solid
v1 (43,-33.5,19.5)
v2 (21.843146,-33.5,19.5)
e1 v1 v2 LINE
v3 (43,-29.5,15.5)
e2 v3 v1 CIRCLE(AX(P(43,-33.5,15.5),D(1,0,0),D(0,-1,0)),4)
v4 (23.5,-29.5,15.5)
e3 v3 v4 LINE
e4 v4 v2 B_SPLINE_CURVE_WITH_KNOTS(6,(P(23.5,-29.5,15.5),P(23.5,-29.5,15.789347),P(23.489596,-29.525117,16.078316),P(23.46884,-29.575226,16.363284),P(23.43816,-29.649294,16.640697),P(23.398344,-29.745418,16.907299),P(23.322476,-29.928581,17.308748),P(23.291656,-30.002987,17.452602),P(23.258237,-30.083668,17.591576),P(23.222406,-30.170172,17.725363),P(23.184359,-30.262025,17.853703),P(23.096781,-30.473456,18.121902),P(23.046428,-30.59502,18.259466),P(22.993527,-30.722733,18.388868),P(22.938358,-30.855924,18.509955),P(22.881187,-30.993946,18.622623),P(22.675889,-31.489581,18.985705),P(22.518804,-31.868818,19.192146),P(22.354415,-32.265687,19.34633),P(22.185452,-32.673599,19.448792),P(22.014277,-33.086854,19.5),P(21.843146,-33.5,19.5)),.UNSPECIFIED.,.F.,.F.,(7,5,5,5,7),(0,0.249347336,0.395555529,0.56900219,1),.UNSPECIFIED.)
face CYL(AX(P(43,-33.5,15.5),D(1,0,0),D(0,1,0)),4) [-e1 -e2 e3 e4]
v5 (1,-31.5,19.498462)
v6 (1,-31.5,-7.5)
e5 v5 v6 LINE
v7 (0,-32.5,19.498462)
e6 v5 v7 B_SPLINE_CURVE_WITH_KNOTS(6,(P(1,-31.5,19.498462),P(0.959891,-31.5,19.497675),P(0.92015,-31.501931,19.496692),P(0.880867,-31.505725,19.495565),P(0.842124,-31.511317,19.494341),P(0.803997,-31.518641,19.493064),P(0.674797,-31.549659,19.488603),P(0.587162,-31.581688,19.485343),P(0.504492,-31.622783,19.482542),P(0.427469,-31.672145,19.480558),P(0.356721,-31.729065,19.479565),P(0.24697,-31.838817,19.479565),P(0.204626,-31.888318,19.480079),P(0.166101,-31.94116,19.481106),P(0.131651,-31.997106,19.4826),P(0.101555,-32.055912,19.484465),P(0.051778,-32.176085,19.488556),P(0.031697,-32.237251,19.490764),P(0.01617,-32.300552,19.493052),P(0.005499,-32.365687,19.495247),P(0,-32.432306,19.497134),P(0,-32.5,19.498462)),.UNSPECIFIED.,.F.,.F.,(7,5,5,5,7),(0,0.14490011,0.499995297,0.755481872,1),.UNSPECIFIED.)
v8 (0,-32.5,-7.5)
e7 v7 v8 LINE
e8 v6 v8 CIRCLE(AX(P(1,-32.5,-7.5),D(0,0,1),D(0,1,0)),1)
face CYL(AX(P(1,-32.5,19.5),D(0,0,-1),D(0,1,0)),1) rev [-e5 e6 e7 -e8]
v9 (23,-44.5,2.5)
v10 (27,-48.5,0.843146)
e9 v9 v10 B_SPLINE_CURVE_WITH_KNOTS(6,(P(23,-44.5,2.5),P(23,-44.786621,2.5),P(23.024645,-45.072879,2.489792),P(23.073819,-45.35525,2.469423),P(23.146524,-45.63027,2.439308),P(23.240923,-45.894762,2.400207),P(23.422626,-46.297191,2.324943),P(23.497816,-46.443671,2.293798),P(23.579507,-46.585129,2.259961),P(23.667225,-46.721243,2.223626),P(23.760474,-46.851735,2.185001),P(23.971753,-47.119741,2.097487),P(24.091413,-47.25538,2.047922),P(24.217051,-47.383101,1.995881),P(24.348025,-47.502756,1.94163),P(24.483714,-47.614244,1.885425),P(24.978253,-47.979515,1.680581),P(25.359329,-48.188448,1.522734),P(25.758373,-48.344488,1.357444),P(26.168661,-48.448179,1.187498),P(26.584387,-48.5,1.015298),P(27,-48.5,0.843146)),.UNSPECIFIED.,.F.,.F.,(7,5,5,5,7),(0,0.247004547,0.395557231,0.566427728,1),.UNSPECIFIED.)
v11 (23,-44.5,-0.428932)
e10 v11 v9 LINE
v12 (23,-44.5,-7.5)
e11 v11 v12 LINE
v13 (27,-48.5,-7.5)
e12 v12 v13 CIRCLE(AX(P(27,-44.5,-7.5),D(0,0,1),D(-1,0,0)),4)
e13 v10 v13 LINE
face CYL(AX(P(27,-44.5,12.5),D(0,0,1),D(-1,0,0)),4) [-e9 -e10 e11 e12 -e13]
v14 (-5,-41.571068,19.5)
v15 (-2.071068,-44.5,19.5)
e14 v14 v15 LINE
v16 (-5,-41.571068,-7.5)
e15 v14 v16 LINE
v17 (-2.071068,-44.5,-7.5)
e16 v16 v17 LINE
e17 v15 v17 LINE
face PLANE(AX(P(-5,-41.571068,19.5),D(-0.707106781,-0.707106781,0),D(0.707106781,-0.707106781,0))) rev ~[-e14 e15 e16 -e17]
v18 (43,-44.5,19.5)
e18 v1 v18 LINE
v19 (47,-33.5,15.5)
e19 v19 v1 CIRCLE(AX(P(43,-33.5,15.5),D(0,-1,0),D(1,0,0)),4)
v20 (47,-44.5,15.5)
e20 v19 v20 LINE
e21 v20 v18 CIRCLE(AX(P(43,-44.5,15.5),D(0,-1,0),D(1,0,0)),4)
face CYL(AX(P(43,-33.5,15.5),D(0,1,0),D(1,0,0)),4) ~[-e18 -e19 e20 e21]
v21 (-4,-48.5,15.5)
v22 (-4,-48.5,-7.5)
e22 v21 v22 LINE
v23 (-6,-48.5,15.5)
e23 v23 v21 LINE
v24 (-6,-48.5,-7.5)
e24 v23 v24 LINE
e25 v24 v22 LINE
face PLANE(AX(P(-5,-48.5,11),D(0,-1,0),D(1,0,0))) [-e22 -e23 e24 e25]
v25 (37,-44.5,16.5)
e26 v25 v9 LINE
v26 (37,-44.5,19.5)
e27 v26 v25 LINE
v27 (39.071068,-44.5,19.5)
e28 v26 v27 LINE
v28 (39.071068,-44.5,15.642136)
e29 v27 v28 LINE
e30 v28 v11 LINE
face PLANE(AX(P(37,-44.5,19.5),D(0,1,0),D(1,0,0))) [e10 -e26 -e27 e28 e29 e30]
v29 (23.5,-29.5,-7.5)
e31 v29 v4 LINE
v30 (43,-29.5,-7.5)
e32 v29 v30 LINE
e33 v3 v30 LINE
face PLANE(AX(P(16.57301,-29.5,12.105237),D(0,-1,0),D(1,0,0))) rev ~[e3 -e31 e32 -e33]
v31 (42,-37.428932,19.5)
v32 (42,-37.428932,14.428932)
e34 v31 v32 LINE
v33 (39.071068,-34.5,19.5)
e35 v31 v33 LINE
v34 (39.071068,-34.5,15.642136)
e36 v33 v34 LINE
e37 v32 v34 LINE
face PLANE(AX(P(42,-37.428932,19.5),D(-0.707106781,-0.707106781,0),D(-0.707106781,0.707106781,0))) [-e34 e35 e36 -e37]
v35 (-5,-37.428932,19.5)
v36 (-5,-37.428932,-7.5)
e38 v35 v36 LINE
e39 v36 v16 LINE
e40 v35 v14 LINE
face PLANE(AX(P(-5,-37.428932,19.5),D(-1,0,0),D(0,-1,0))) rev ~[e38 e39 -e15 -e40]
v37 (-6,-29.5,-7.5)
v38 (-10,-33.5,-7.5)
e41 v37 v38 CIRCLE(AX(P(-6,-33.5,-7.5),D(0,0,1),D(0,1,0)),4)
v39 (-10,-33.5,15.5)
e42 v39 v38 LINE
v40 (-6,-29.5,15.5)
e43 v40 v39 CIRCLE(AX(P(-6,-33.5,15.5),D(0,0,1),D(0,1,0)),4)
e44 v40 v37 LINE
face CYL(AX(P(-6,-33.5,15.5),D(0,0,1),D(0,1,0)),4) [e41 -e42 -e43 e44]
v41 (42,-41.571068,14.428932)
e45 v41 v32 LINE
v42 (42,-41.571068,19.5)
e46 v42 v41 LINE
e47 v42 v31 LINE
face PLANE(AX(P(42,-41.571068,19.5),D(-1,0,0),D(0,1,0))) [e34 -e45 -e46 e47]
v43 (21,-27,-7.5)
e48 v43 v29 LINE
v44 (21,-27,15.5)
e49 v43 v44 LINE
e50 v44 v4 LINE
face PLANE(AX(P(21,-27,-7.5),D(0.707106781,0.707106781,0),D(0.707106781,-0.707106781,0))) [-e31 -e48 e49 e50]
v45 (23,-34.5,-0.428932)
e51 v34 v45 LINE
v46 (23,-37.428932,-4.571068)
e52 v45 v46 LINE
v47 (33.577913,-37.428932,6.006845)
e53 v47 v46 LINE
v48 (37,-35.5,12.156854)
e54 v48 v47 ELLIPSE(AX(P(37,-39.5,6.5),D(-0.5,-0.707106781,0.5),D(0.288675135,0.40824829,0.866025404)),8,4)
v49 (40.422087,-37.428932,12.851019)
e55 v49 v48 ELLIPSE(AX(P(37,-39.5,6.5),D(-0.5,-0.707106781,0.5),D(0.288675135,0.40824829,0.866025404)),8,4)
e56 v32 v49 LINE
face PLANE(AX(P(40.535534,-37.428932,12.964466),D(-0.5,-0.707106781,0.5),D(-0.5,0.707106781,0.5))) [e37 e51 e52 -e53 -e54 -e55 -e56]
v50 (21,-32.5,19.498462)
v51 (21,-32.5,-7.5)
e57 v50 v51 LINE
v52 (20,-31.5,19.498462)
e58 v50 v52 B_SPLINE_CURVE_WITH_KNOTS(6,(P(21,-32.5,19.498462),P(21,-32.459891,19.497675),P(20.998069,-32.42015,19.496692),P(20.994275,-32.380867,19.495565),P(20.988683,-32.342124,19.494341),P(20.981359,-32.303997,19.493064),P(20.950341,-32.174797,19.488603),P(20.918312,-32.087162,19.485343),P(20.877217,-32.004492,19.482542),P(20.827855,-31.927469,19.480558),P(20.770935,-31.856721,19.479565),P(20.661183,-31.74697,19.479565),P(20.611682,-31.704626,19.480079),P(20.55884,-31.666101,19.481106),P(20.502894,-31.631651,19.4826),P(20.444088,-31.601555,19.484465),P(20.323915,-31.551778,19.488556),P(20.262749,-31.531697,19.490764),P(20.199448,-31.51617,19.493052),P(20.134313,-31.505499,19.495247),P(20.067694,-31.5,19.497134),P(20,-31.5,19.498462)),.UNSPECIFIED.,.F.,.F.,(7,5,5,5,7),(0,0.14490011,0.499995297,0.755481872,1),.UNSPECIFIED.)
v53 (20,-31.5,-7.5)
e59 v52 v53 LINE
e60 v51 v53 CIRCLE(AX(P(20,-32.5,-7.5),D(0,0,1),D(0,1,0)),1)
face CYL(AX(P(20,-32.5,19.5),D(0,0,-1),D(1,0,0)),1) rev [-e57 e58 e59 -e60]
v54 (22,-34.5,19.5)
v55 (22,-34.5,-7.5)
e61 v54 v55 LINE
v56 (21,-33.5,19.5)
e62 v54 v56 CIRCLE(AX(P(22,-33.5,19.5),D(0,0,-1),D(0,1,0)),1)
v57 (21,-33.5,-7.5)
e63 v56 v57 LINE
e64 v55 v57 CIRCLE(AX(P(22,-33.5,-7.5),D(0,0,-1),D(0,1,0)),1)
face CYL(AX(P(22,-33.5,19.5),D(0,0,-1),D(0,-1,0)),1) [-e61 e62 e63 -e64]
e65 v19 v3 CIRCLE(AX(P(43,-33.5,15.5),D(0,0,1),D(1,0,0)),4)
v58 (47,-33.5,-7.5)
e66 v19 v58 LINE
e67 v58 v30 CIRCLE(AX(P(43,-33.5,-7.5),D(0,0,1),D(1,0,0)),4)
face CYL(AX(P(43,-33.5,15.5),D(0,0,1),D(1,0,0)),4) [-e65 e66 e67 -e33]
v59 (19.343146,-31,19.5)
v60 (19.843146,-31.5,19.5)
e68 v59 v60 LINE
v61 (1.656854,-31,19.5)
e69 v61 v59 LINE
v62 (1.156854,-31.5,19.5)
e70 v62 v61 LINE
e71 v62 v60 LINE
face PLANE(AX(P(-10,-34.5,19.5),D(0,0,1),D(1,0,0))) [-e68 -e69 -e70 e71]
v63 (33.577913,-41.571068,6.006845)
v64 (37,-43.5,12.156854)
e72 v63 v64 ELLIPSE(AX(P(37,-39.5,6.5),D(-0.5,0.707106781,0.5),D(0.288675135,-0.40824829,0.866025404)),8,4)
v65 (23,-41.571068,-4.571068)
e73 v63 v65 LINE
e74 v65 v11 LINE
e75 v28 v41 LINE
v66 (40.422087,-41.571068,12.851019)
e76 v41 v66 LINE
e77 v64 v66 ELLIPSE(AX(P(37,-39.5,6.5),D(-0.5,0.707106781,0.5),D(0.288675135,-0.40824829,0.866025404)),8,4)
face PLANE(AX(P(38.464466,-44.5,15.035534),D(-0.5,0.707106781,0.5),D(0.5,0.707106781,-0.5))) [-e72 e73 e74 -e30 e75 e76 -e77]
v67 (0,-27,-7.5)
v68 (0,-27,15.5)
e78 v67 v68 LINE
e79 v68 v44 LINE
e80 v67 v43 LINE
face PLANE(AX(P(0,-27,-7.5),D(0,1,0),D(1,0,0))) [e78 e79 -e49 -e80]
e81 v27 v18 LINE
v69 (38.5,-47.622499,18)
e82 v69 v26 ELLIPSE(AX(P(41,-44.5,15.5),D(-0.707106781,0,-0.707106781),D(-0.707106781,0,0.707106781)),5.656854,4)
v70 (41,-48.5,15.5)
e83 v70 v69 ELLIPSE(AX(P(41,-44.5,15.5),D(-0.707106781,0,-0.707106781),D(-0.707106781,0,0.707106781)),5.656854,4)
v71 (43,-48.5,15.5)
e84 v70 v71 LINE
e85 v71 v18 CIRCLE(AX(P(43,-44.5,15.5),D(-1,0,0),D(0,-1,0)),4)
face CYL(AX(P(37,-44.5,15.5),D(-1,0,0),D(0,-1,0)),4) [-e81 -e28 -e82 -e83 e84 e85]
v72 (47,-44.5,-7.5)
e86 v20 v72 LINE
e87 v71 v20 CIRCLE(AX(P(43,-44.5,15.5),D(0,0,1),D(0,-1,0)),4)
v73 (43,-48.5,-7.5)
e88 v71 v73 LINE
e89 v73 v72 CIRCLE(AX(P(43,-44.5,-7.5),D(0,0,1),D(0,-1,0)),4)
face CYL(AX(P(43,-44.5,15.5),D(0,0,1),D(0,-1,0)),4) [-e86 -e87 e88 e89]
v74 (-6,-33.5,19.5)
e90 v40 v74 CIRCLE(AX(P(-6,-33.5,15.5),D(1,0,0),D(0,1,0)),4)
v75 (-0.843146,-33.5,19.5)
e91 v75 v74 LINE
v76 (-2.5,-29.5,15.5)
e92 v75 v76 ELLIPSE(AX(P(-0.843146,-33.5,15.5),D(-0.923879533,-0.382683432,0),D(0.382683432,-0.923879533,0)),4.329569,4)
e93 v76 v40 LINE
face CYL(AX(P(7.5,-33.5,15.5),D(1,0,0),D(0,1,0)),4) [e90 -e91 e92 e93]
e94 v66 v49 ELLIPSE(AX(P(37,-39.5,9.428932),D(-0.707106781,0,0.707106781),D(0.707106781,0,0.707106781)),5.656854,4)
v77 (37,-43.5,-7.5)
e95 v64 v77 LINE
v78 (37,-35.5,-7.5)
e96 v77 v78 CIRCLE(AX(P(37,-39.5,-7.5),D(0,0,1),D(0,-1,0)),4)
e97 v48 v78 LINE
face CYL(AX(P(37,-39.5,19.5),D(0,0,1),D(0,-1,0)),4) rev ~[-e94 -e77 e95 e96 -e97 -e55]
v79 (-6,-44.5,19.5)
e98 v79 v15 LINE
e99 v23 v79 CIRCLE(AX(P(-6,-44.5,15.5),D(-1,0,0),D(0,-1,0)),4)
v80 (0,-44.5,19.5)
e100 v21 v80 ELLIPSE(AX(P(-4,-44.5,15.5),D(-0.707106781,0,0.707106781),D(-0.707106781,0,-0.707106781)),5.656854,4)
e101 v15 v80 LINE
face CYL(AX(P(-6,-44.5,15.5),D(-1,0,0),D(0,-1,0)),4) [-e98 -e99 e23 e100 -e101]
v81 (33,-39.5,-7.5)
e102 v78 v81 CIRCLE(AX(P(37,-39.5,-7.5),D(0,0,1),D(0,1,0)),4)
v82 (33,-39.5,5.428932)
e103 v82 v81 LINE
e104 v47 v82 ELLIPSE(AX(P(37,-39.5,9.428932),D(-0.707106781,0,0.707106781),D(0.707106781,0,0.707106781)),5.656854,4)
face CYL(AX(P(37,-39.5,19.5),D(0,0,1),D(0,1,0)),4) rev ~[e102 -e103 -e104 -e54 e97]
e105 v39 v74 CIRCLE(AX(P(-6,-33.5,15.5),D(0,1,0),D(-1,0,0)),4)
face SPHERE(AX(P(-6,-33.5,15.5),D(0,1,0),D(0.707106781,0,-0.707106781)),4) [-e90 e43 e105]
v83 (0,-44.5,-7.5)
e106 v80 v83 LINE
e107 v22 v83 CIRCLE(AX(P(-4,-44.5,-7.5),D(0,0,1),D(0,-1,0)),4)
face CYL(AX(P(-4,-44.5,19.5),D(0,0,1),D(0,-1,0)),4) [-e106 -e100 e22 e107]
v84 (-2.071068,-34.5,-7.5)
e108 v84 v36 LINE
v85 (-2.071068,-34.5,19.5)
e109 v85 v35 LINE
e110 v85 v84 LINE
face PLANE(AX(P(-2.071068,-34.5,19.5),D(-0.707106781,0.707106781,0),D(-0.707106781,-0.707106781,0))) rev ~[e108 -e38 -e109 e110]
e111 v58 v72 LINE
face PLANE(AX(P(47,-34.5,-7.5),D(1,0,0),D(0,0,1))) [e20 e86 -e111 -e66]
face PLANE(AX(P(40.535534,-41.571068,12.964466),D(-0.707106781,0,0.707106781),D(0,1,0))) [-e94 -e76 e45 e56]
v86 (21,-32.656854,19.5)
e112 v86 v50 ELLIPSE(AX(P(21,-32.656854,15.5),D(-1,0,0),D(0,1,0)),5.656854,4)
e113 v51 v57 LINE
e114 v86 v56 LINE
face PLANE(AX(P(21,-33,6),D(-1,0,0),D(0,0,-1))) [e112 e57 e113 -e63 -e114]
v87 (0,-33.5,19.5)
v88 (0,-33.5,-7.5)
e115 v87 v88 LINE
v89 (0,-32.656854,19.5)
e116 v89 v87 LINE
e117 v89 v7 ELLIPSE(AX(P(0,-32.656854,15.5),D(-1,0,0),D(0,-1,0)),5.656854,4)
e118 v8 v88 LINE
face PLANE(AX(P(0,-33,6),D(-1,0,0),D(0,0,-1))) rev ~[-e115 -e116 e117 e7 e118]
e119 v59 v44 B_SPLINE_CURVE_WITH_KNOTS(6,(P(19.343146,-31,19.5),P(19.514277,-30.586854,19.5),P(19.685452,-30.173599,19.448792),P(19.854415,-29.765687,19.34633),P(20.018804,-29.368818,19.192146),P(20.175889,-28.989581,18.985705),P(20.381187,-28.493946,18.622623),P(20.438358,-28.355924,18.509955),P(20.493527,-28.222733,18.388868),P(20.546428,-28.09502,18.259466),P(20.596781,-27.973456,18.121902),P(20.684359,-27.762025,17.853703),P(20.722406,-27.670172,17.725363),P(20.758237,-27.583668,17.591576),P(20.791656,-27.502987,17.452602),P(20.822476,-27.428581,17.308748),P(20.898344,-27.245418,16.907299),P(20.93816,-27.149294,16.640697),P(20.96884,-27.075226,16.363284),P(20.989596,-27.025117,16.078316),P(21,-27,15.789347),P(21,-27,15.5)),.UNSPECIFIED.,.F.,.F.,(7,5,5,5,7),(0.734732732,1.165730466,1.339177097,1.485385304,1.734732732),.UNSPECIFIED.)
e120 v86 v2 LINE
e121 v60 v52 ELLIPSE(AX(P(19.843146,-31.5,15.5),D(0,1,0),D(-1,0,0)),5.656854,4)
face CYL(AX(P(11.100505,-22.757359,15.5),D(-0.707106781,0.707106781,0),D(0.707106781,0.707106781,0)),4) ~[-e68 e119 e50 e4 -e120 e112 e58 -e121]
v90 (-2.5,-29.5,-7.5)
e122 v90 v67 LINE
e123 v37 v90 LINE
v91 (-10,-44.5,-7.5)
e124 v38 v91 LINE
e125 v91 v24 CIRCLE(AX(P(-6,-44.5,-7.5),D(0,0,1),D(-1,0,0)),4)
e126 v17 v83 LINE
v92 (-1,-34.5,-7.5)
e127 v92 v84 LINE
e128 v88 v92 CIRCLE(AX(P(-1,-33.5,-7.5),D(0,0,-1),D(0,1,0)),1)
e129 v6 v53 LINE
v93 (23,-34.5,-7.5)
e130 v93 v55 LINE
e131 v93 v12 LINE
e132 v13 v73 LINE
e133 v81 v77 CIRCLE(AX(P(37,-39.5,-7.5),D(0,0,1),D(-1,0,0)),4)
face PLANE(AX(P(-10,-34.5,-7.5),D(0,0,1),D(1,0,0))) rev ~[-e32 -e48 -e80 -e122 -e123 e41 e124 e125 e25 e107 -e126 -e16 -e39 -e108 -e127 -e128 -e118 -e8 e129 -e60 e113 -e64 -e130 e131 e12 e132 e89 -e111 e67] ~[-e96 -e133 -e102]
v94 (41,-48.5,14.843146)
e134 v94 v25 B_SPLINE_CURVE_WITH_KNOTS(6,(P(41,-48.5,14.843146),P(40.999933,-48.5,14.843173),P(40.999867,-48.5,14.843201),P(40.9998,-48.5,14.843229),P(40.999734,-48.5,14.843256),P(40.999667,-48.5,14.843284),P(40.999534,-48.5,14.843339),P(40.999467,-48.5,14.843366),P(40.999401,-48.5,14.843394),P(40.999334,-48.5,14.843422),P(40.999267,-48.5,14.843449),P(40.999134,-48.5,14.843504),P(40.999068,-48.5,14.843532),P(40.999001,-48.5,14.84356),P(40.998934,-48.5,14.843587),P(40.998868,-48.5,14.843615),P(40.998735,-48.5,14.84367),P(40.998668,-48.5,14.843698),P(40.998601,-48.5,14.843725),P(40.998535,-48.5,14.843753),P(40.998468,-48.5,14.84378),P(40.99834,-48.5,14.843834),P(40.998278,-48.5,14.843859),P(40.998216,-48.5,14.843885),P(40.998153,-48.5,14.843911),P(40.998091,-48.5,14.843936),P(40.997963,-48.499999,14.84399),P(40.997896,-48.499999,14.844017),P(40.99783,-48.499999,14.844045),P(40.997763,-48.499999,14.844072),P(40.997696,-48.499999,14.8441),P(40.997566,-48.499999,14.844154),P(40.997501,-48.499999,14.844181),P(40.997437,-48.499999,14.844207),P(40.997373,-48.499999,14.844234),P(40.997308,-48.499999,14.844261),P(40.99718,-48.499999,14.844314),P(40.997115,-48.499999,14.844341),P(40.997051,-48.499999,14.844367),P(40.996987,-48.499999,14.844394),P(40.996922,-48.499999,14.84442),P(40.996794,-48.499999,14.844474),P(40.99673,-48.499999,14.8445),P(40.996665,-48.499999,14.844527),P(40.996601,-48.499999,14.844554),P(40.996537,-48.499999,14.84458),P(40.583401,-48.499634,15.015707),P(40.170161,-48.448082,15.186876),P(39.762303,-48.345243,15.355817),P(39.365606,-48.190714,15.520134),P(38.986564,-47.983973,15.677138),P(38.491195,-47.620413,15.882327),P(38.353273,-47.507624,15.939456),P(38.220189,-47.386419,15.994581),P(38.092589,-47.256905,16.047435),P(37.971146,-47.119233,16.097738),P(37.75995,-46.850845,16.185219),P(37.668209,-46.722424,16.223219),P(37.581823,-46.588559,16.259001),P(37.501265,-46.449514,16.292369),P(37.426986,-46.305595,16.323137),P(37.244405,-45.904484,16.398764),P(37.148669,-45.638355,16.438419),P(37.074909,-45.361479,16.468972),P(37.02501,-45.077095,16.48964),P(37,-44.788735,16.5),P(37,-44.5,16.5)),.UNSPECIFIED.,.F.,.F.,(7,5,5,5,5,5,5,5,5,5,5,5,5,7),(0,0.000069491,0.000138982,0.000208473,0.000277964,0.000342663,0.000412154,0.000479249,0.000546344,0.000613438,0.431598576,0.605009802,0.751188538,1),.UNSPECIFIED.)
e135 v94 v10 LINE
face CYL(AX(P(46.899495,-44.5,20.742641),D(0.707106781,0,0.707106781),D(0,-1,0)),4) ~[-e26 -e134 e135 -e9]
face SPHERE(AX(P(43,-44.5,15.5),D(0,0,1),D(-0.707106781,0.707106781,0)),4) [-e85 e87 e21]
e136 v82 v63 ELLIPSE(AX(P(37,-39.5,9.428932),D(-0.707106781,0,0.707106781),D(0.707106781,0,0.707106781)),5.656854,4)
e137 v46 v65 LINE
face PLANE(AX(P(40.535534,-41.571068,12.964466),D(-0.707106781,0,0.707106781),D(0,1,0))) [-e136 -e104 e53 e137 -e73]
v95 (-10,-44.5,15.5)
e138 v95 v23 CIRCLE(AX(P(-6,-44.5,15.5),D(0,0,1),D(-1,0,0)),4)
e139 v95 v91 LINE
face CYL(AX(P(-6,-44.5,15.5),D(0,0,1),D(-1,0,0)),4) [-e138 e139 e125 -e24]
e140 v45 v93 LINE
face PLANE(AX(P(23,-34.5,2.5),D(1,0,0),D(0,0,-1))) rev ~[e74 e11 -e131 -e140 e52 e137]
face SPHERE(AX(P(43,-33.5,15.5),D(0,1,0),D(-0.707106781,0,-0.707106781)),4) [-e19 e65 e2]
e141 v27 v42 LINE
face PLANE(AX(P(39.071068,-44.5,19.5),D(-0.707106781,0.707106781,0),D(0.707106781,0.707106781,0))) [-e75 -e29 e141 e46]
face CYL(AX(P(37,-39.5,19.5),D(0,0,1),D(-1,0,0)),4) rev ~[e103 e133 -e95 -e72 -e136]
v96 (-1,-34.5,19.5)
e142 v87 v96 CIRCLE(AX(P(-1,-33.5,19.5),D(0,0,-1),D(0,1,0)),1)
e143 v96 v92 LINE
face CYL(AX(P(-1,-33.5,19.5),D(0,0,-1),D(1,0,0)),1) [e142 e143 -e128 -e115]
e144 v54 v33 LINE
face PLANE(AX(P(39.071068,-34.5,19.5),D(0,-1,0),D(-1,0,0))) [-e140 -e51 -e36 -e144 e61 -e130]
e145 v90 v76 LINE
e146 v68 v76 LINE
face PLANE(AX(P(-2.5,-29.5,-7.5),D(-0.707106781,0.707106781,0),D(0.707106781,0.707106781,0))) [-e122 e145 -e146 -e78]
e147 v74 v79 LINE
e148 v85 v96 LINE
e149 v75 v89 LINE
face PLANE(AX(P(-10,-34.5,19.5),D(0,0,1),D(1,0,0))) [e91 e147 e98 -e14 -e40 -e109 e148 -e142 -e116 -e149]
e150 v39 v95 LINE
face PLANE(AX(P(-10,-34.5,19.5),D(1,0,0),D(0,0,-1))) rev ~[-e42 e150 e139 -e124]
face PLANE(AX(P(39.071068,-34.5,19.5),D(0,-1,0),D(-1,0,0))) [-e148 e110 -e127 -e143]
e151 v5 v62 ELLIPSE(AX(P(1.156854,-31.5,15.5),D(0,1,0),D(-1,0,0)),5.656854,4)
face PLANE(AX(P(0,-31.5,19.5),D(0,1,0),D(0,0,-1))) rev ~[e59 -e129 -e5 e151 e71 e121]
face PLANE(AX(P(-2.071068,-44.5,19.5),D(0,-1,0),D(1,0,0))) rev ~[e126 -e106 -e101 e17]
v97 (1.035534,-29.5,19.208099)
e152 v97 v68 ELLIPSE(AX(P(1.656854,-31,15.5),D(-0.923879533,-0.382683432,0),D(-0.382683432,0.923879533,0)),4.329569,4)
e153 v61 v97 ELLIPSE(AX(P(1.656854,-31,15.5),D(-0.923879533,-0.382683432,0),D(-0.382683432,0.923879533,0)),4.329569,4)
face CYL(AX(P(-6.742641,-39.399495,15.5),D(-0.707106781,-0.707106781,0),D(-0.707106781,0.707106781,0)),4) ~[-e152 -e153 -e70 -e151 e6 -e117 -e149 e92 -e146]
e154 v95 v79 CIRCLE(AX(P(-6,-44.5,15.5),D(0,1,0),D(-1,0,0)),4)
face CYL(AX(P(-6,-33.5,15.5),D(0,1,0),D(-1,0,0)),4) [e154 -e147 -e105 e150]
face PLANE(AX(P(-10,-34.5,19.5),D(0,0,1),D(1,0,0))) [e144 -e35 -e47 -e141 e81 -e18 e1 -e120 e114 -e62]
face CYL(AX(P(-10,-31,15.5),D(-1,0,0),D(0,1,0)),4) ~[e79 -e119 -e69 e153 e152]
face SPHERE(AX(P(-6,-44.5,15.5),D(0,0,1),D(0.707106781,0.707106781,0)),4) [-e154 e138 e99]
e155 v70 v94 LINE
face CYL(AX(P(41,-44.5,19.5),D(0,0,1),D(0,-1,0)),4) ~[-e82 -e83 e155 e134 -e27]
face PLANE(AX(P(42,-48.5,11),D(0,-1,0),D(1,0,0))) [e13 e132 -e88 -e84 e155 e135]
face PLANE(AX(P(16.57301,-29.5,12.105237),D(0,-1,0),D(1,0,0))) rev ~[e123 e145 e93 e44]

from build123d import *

# Parameters (mm, degrees)
F0_W           = 10
F0_H           = 17
F0_H_2         = 10
F0_W_2         = 23
F1_DEPTH       = 5
F2_DEPTH       = 14
F4_DEPTH       = 35
F8_DEPTH       = 27.001
F8_DEPTH_BACK  = 35
F10_W          = 27
F10_H          = 3
F11_DEPTH      = 21
F13_DEPTH      = 27
F14_R          = 1
F15_T1_DEPTH   = 11
F15_T3_DEPTH   = 6
F15_T5_DEPTH   = 23
F15_T7_DEPTH   = 6
F15_T9_DEPTH   = 27
F15_S13_W      = 4.08
F15_S13_H      = 4.08
F15_T14_DEPTH  = 4.08
F15_S19_W      = 4.08
F15_S19_H      = 4.08
F15_T20_DEPTH  = 4.08
F15_S25_W      = 4.08
F15_S25_H      = 4.08
F15_T26_DEPTH  = 4.08
F15_S31_W      = 4.08
F15_S31_H      = 4.08
F15_T32_DEPTH  = 4.08
F15_T38_DEPTH  = 13
F15_T43_DEPTH  = 39.7989898732
F15_T49_DEPTH  = 20
F15_T54_DEPTH  = 29.5
F15_T59_DEPTH  = 23.5355339059
F15_T65_DEPTH  = 41
F15_T71_DEPTH  = 23.5355339059
F15_T77_DEPTH  = 13.5
F15_T83_DEPTH  = 16
F15_T87_DEPTH  = 23
F15_T95_DEPTH  = 16
F15_T99_DEPTH  = 37
F15_T106_DEPTH = 13
F15_T110_DEPTH = 39.7989898732
F15_T117_DEPTH = 20
F15_T121_DEPTH = 39.7989898732
F15_T128_DEPTH = 29.5
F15_T132_DEPTH = 23.5355339059
F15_T139_DEPTH = 23.5355339059
F15_T143_DEPTH = 41
F15_T150_DEPTH = 41
F15_T154_DEPTH = 23.5355339059
F15_T161_DEPTH = 23.5355339059
F15_T165_DEPTH = 13.5
F16_ANGLE      = 270


# Not quite as in the source:
# - a fillet or chamfer that OpenCascade refuses, or shapes differently, is made with other operations: its cross-section is extruded or revolved along the edge and cut away or added


with BuildPart() as f1:
    # F0 (on Top) → F1 (new body)
    with BuildSketch(Plane.XY):
        Polygon((37, 0), (0, 0), (0, -17), (23, -17), (37, -3), align=None)
        with Locations((-5, -8.5)):
            Rectangle(F0_W, F0_H)
        Polygon((37, -17), (23, -17), (23, -27), (47, -27), (47, -17), align=None)
        with Locations((-5, -22)):
            Rectangle(F0_W, F0_H_2)
        Polygon((47, 0), (37, 0), (37, -3), (37, -17), (47, -17), align=None)
        with Locations((11.5, -22)):
            Rectangle(F0_W_2, F0_H_2)
        Polygon((37, -17), (37, -3), (23, -17), align=None)
    extrude(amount=-F1_DEPTH)

    # F0 (on Top) → F2 (join)
    with BuildSketch(Plane.XY):
        with Locations((-5, -8.5)):
            Rectangle(F0_W, F0_H)
        Polygon((47, 0), (37, 0), (37, -3), (37, -17), (47, -17), align=None)
        Polygon((37, -17), (37, -3), (23, -17), align=None)
        Polygon((37, -17), (23, -17), (23, -27), (47, -27), (47, -17), align=None)
        with Locations((-5, -22)):
            Rectangle(F0_W, F0_H_2)
    extrude(amount=F2_DEPTH)

    # F3 (on face) → F4 (cut)
    with BuildSketch(Plane(origin=(0, 0, 0), x_dir=(-1, 0, 0), z_dir=(0, 1, 0))):
        Polygon((2.0710678119, 0), (5, 2.9289321881), (5, 7.0710678119), (2.0710678119, 10), (0, 10), (0, 0), align=None)
    extrude(amount=-F4_DEPTH, mode=Mode.SUBTRACT)

    # F7: sweep along a path in F6
    with BuildLine(Plane.XY.offset(4.5)) as f7_path:
        Line((37, 0), (37, -3))
        Line((37, -3), (23, -17))
        Line((23, -17), (19.396028844, -20.603971156))
    # F3 (on face) → F7 (sweep, cut)
    with BuildSketch(Plane(origin=(0, 0, 0), x_dir=(-1, 0, 0), z_dir=(0, 1, 0))):
        with BuildLine():
            Line((-39.0710678119, 0), (-37, 0))
            Line((-37, 0), (-37, 1))
            ThreePointArc((-37, 1), (-41, 5), (-37, 9))
            Line((-37, 9), (-37, 10))
            Line((-37, 10), (-39.0710678119, 10))
            Line((-39.0710678119, 10), (-42, 7.0710678119))
            Line((-42, 7.0710678119), (-42, 2.9289321881))
            Line((-42, 2.9289321881), (-39.0710678119, 0))
        make_face()
        with BuildLine():
            ThreePointArc((-37, 9), (-41, 5), (-37, 1))
            Line((-37, 1), (-37, 9))
        make_face()
    sweep(path=f7_path.line, transition=Transition.RIGHT, mode=Mode.SUBTRACT)

    # F3 (on face) → F8 (cut, two sides)
    with BuildSketch(Plane(origin=(0, 0, 0), x_dir=(-1, 0, 0), z_dir=(0, 1, 0))) as f8_sk:
        with BuildLine():
            Line((-37, 9), (-37, 1))
            ThreePointArc((-37, 1), (-34.1715728753, 2.1715728753), (-33, 5))
            ThreePointArc((-33, 5), (-34.1715728753, 7.8284271247), (-37, 9))
        make_face()
        with BuildLine():
            ThreePointArc((-37, 9), (-41, 5), (-37, 1))
            Line((-37, 1), (-37, 9))
        make_face()
    extrude(amount=-F8_DEPTH, mode=Mode.SUBTRACT)
    extrude(f8_sk.sketch, amount=F8_DEPTH_BACK, mode=Mode.SUBTRACT)

    # F10 (on offset) → F11 (cut)
    with BuildSketch(Plane(origin=(0, 0, 0), x_dir=(0, -1, 0), z_dir=(-1, 0, 0))):
        with Locations((13.5, -1.5)):
            Rectangle(F10_W, F10_H)
    extrude(amount=-F11_DEPTH, mode=Mode.SUBTRACT)

    # F12 (on face) → F13 (join, through all)
    with BuildSketch(Plane.XZ.offset(27)):
        Polygon((21, -7.5), (23.5, -5), (-2.5, -5), (0, -7.5), align=None)
    extrude(amount=-F13_DEPTH)

    # F14
    f14_edges = [f1.edges().sort_by_distance(p)[0] for p in [
        (0, -13.5, 0),
        (21, -13.5, 0),
        (21, -13.5, -3),
        (0, -13.5, -3),
    ]]
    fillet(f14_edges, radius=F14_R)

    # F15: fillet of radius 4 on 17 edges, made by hand

    # F15_s2 → F15_t1 (cut)
    with BuildSketch(Plane.XY.offset(-1)):
        with BuildLine():
            ThreePointArc((-10, -4), (-8.8284271247, -1.1715728753), (-6, 0))
            Line((-6, 0), (-6, 0.08))
            Line((-6, 0.08), (-10.08, 0.08))
            Line((-10.08, 0.08), (-10.08, -4))
            Line((-10.08, -4), (-10, -4))
        make_face()
        with BuildLine():
            ThreePointArc((47, -4), (45.8284271247, -1.1715728753), (43, 0))
            Line((43, 0), (43, 0.08))
            Line((43, 0.08), (47.08, 0.08))
            Line((47.08, 0.08), (47.08, -4))
            Line((47.08, -4), (47, -4))
        make_face()
    extrude(amount=F15_T1_DEPTH, mode=Mode.SUBTRACT)

    # F15_s4 → F15_t3 (cut)
    with BuildSketch(Plane.YZ.offset(37)):
        with BuildLine():
            ThreePointArc((-4, 14), (-1.1715728753, 12.8284271247), (0, 10))
            Line((0, 10), (0.08, 10))
            Line((0.08, 10), (0.08, 14.08))
            Line((0.08, 14.08), (-4, 14.08))
            Line((-4, 14.08), (-4, 14))
        make_face()
    extrude(amount=F15_T3_DEPTH, mode=Mode.SUBTRACT)

    # F15_s6 → F15_t5 (cut)
    with BuildSketch(Plane.XZ.offset(4)):
        with BuildLine():
            ThreePointArc((43, 14), (45.8284271247, 12.8284271247), (47, 10))
            Line((47, 10), (47.08, 10))
            Line((47.08, 10), (47.08, 14.08))
            Line((47.08, 14.08), (43, 14.08))
            Line((43, 14.08), (43, 14))
        make_face()
        with BuildLine():
            ThreePointArc((47, -1), (45.8284271247, -3.8284271247), (43, -5))
            Line((43, -5), (43, -5.08))
            Line((43, -5.08), (47.08, -5.08))
            Line((47.08, -5.08), (47.08, -1))
            Line((47.08, -1), (47, -1))
        make_face()
        with BuildLine():
            ThreePointArc((-10, 10), (-8.8284271247, 12.8284271247), (-6, 14))
            Line((-6, 14), (-6, 14.08))
            Line((-6, 14.08), (-10.08, 14.08))
            Line((-10.08, 14.08), (-10.08, 10))
            Line((-10.08, 10), (-10, 10))
        make_face()
        with BuildLine():
            ThreePointArc((-6, -5), (-8.8284271247, -3.8284271247), (-10, -1))
            Line((-10, -1), (-10.08, -1))
            Line((-10.08, -1), (-10.08, -5.08))
            Line((-10.08, -5.08), (-6, -5.08))
            Line((-6, -5.08), (-6, -5))
        make_face()
    extrude(amount=F15_T5_DEPTH, mode=Mode.SUBTRACT)

    # F15_s8 → F15_t7 (cut)
    with BuildSketch(Plane.YZ.offset(-6)):
        with BuildLine():
            ThreePointArc((-4, 14), (-1.1715728753, 12.8284271247), (0, 10))
            Line((0, 10), (0.08, 10))
            Line((0.08, 10), (0.08, 14.08))
            Line((0.08, 14.08), (-4, 14.08))
            Line((-4, 14.08), (-4, 14))
        make_face()
    extrude(amount=F15_T7_DEPTH, mode=Mode.SUBTRACT)

    # F15_s10 → F15_t9 (cut)
    with BuildSketch(Plane.XZ):
        with BuildLine():
            ThreePointArc((-4, 14), (-1.1715728753, 12.8284271247), (0, 10))
            Line((0, 10), (0.08, 10))
            Line((0.08, 10), (0.08, 14.08))
            Line((0.08, 14.08), (-4, 14.08))
            Line((-4, 14.08), (-4, 14))
        make_face()
    extrude(amount=F15_T9_DEPTH, mode=Mode.SUBTRACT)


with BuildPart() as f15_tool12:
    # F15_s13 → F15_t14 (new body)
    with BuildSketch(Plane.XZ.offset(4)):
        with Locations((-8.04, 12.04)):
            Rectangle(F15_S13_W, F15_S13_H)
    extrude(amount=-F15_T14_DEPTH)

    # F15_s15 → F15_t16 (revolve, cut)
    with BuildSketch(Plane(origin=(-6, -4, 10), x_dir=(0.7071067812, 0, -0.7071067812), z_dir=(0.7071067812, 0, 0.7071067812))):
        with BuildLine():
            ThreePointArc((0, -4), (4, 0), (0, 4))
            Line((0, 4), (0, -4))
        make_face()
    revolve(axis=Axis((-6, -4, 10), (0, 1, 0)), mode=Mode.SUBTRACT)


with BuildPart() as f1_1:
    add(f1.part)

    # F15_t11: cut F15_tool12
    add(f15_tool12.part, mode=Mode.SUBTRACT)


with BuildPart() as f15_tool18:
    # F15_s19 → F15_t20 (new body)
    with BuildSketch(Plane.XY.offset(-1)):
        with Locations((-8.04, -1.96)):
            Rectangle(F15_S19_W, F15_S19_H)
    extrude(amount=-F15_T20_DEPTH)

    # F15_s21 → F15_t22 (revolve, cut)
    with BuildSketch(Plane(origin=(-6, -4, -1), x_dir=(0.7071067812, -0.7071067812, 0), z_dir=(0.7071067812, 0.7071067812, 0))):
        with BuildLine():
            ThreePointArc((0, -4), (4, 0), (0, 4))
            Line((0, 4), (0, -4))
        make_face()
    revolve(axis=Axis((-6, -4, -1), (0, 0, -1)), mode=Mode.SUBTRACT)


with BuildPart() as f1_2:
    add(f1_1.part)

    # F15_t17: cut F15_tool18
    add(f15_tool18.part, mode=Mode.SUBTRACT)


with BuildPart() as f15_tool24:
    # F15_s25 → F15_t26 (new body)
    with BuildSketch(Plane.XY.offset(-1)):
        with Locations((45.04, -1.96)):
            Rectangle(F15_S25_W, F15_S25_H)
    extrude(amount=-F15_T26_DEPTH)

    # F15_s27 → F15_t28 (revolve, cut)
    with BuildSketch(Plane(origin=(43, -4, -1), x_dir=(-0.7071067812, -0.7071067812, 0), z_dir=(0.7071067812, -0.7071067812, 0))):
        with BuildLine():
            ThreePointArc((0, -4), (4, 0), (0, 4))
            Line((0, 4), (0, -4))
        make_face()
    revolve(axis=Axis((43, -4, -1), (0, 0, -1)), mode=Mode.SUBTRACT)


with BuildPart() as f1_3:
    add(f1_2.part)

    # F15_t23: cut F15_tool24
    add(f15_tool24.part, mode=Mode.SUBTRACT)


with BuildPart() as f15_tool30:
    # F15_s31 → F15_t32 (new body)
    with BuildSketch(Plane.XZ.offset(4)):
        with Locations((45.04, 12.04)):
            Rectangle(F15_S31_W, F15_S31_H)
    extrude(amount=-F15_T32_DEPTH)

    # F15_s33 → F15_t34 (revolve, cut)
    with BuildSketch(Plane(origin=(43, -4, 10), x_dir=(-0.7071067812, 0, -0.7071067812), z_dir=(0.7071067812, 0, -0.7071067812))):
        with BuildLine():
            ThreePointArc((0, -4), (4, 0), (0, 4))
            Line((0, 4), (0, -4))
        make_face()
    revolve(axis=Axis((43, -4, 10), (0, 1, 0)), mode=Mode.SUBTRACT)


with BuildPart() as f1_4:
    add(f1_3.part)

    # F15_t29: cut F15_tool30
    add(f15_tool30.part, mode=Mode.SUBTRACT)


with BuildPart() as f15_tool36:
    # F15_s37 → F15_t38 (new body)
    with BuildSketch(Plane.XZ):
        with BuildLine():
            ThreePointArc((41, 14), (38.1715728753, 12.8284271247), (37, 10))
            Line((37, 10), (36.92, 10))
            Line((36.92, 10), (36.92, 14.08))
            Line((36.92, 14.08), (41, 14.08))
            Line((41, 14.08), (41, 14))
        make_face()
    extrude(amount=F15_T38_DEPTH)

    split(bisect_by=Plane(origin=(20, -20, 0), x_dir=(0, 0, 1), z_dir=(-0.7071067812, 0.7071067812, 0)), keep=Keep.TOP)


with BuildPart() as f1_5:
    add(f1_4.part)

    # F15_t35: cut F15_tool36
    add(f15_tool36.part, mode=Mode.SUBTRACT)


with BuildPart() as f15_tool41:
    # F15_s42 → F15_t43 (new body)
    with BuildSketch(Plane(origin=(24.0710678119, 24.0710678119, 0), x_dir=(0, 0, 1), z_dir=(-0.7071067812, -0.7071067812, 0))):
        with BuildLine():
            ThreePointArc((14, -32.2842712475), (12.8284271247, -29.4558441227), (10, -28.2842712475))
            Line((10, -28.2842712475), (10, -28.2042712475))
            Line((10, -28.2042712475), (14.08, -28.2042712475))
            Line((14.08, -28.2042712475), (14.08, -32.2842712475))
            Line((14.08, -32.2842712475), (14, -32.2842712475))
        make_face()
    extrude(amount=F15_T43_DEPTH)

    split(bisect_by=Plane.YZ.offset(23), keep=Keep.TOP)

    split(bisect_by=Plane.YZ.offset(37), keep=Keep.BOTTOM)


with BuildPart() as f1_6:
    add(f1_5.part)

    # F15_t40: cut F15_tool41
    add(f15_tool41.part, mode=Mode.SUBTRACT)


with BuildPart() as f15_tool47:
    # F15_s48 → F15_t49 (new body)
    with BuildSketch(Plane.XZ.offset(7)):
        with BuildLine():
            ThreePointArc((23, 10), (24.1715728753, 12.8284271247), (27, 14))
            Line((27, 14), (27, 14.08))
            Line((27, 14.08), (22.92, 14.08))
            Line((22.92, 14.08), (22.92, 10))
            Line((22.92, 10), (23, 10))
        make_face()
    extrude(amount=F15_T49_DEPTH)

    split(bisect_by=Plane(origin=(20, -20, 0), x_dir=(0, 0, 1), z_dir=(0.7071067812, -0.7071067812, 0)), keep=Keep.TOP)


with BuildPart() as f1_7:
    add(f1_6.part)

    # F15_t46: cut F15_tool47
    add(f15_tool47.part, mode=Mode.SUBTRACT)


with BuildPart() as f15_tool52:
    # F15_s53 → F15_t54 (new body)
    with BuildSketch(Plane.YZ.offset(43)):
        with BuildLine():
            ThreePointArc((-4, -5), (-1.1715728753, -3.8284271247), (0, -1))
            Line((0, -1), (0.08, -1))
            Line((0.08, -1), (0.08, -5.08))
            Line((0.08, -5.08), (-4, -5.08))
            Line((-4, -5.08), (-4, -5))
        make_face()
    extrude(amount=-F15_T54_DEPTH)

    split(bisect_by=Plane(origin=(14.25, 0, -14.25), x_dir=(0, 1, 0), z_dir=(0.7071067812, 0, -0.7071067812)), keep=Keep.TOP)


with BuildPart() as f1_8:
    add(f1_7.part)

    # F15_t51: cut F15_tool52
    add(f15_tool52.part, mode=Mode.SUBTRACT)


with BuildPart() as f15_tool57:
    # F15_s58 → F15_t59 (new body)
    with BuildSketch(Plane(origin=(-0.3210678119, 0, -0.3210678119), x_dir=(0, 1, 0), z_dir=(0.7071067812, 0, 0.7071067812))):
        with BuildLine():
            ThreePointArc((-4, -20.1525432638), (-1.1715728753, -18.9809703886), (0, -16.1525432638))
            Line((0, -16.1525432638), (0.08, -16.1525432638))
            Line((0.08, -16.1525432638), (0.08, -20.2325432638))
            Line((0.08, -20.2325432638), (-4, -20.2325432638))
            Line((-4, -20.2325432638), (-4, -20.1525432638))
        make_face()
    extrude(amount=F15_T59_DEPTH)

    split(bisect_by=Plane.XY.offset(-5), keep=Keep.BOTTOM)

    split(bisect_by=Plane.XY.offset(-7.5), keep=Keep.TOP)


with BuildPart() as f1_9:
    add(f1_8.part)

    # F15_t56: cut F15_tool57
    add(f15_tool57.part, mode=Mode.SUBTRACT)


with BuildPart() as f15_tool63:
    # F15_s64 → F15_t65 (new body)
    with BuildSketch(Plane.YZ.offset(-10)):
        with BuildLine():
            ThreePointArc((-4, -7.5), (-1.1715728753, -6.3284271247), (0, -3.5))
            Line((0, -3.5), (0.08, -3.5))
            Line((0.08, -3.5), (0.08, -7.58))
            Line((0.08, -7.58), (-4, -7.58))
            Line((-4, -7.58), (-4, -7.5))
        make_face()
    extrude(amount=F15_T65_DEPTH)

    split(bisect_by=Plane(origin=(14.25, 0, -14.25), x_dir=(0, 1, 0), z_dir=(-0.7071067812, 0, 0.7071067812)), keep=Keep.TOP)

    split(bisect_by=Plane(origin=(-3.75, 0, -3.75), x_dir=(0, 1, 0), z_dir=(0.7071067812, 0, 0.7071067812)), keep=Keep.TOP)


with BuildPart() as f1_10:
    add(f1_9.part)

    # F15_t62: cut F15_tool63
    add(f15_tool63.part, mode=Mode.SUBTRACT)


with BuildPart() as f15_tool69:
    # F15_s70 → F15_t71 (new body)
    with BuildSketch(Plane(origin=(-5.8210678119, 0, 5.8210678119), x_dir=(0, 1, 0), z_dir=(0.7071067812, 0, -0.7071067812))):
        with BuildLine():
            ThreePointArc((-4, -5.3033008589), (-1.1715728753, -4.1317279836), (0, -1.3033008589))
            Line((0, -1.3033008589), (0.08, -1.3033008589))
            Line((0.08, -1.3033008589), (0.08, -5.3833008589))
            Line((0.08, -5.3833008589), (-4, -5.3833008589))
            Line((-4, -5.3833008589), (-4, -5.3033008589))
        make_face()
    extrude(amount=F15_T71_DEPTH)

    split(bisect_by=Plane.XY.offset(-7.5), keep=Keep.TOP)

    split(bisect_by=Plane.XY.offset(-5), keep=Keep.BOTTOM)


with BuildPart() as f1_11:
    add(f1_10.part)

    # F15_t68: cut F15_tool69
    add(f15_tool69.part, mode=Mode.SUBTRACT)


with BuildPart() as f15_tool75:
    # F15_s76 → F15_t77 (new body)
    with BuildSketch(Plane.YZ.offset(7.5)):
        with BuildLine():
            ThreePointArc((-4, -5), (-1.1715728753, -3.8284271247), (0, -1))
            Line((0, -1), (0.08, -1))
            Line((0.08, -1), (0.08, -5.08))
            Line((0.08, -5.08), (-4, -5.08))
            Line((-4, -5.08), (-4, -5))
        make_face()
    extrude(amount=-F15_T77_DEPTH)

    split(bisect_by=Plane(origin=(-3.75, 0, -3.75), x_dir=(0, 1, 0), z_dir=(-0.7071067812, 0, -0.7071067812)), keep=Keep.TOP)


with BuildPart() as f1_12:
    add(f1_11.part)

    # F15_t74: cut F15_tool75
    add(f15_tool75.part, mode=Mode.SUBTRACT)


with BuildPart() as f15_tool81:
    # F15_s82 → F15_t83 (new body)
    with BuildSketch(Plane.YZ.offset(43)):
        with BuildLine():
            ThreePointArc((-4, 14), (-1.1715728753, 12.8284271247), (0, 10))
            Line((0, 10), (0.08, 10))
            Line((0.08, 10), (0.08, 14.08))
            Line((0.08, 14.08), (-4, 14.08))
            Line((-4, 14.08), (-4, 14))
        make_face()
    extrude(amount=-F15_T83_DEPTH)

    split(bisect_by=Plane.YZ.offset(37), keep=Keep.BOTTOM)


with BuildPart() as f15_tool85:
    # F15_s86 → F15_t87 (new body)
    with BuildSketch(Plane.XZ.offset(-10)):
        with BuildLine():
            ThreePointArc((41, 14), (38.1715728753, 12.8284271247), (37, 10))
            Line((37, 10), (36.92, 10))
            Line((36.92, 10), (36.92, 14.08))
            Line((36.92, 14.08), (41, 14.08))
            Line((41, 14.08), (41, 14))
        make_face()
    extrude(amount=F15_T87_DEPTH)

    split(bisect_by=Plane.XZ, keep=Keep.BOTTOM)

    split(bisect_by=Plane(origin=(20, -20, 0), x_dir=(0, 0, 1), z_dir=(-0.7071067812, 0.7071067812, 0)), keep=Keep.TOP)


with BuildPart() as f15_tool81_1:
    add(f15_tool81.part)

    # F15_t90: intersect F15_tool85
    add(f15_tool85.part, mode=Mode.INTERSECT)


with BuildPart() as f1_13:
    add(f1_12.part)

    # F15_t79: cut F15_tool81
    add(f15_tool81_1.part, mode=Mode.SUBTRACT)


with BuildPart() as f15_tool93:
    # F15_s94 → F15_t95 (new body)
    with BuildSketch(Plane.YZ.offset(10)):
        with BuildLine():
            ThreePointArc((-4, 14), (-1.1715728753, 12.8284271247), (0, 10))
            Line((0, 10), (0.08, 10))
            Line((0.08, 10), (0.08, 14.08))
            Line((0.08, 14.08), (-4, 14.08))
            Line((-4, 14.08), (-4, 14))
        make_face()
    extrude(amount=-F15_T95_DEPTH)

    split(bisect_by=Plane.YZ, keep=Keep.TOP)


with BuildPart() as f15_tool97:
    # F15_s98 → F15_t99 (new body)
    with BuildSketch(Plane.XZ.offset(27)):
        with BuildLine():
            ThreePointArc((-4, 14), (-1.1715728753, 12.8284271247), (0, 10))
            Line((0, 10), (0.08, 10))
            Line((0.08, 10), (0.08, 14.08))
            Line((0.08, 14.08), (-4, 14.08))
            Line((-4, 14.08), (-4, 14))
        make_face()
    extrude(amount=-F15_T99_DEPTH)

    split(bisect_by=Plane.XZ, keep=Keep.BOTTOM)


with BuildPart() as f15_tool93_1:
    add(f15_tool93.part)

    # F15_t101: intersect F15_tool97
    add(f15_tool97.part, mode=Mode.INTERSECT)


with BuildPart() as f1_14:
    add(f1_13.part)

    # F15_t91: cut F15_tool93
    add(f15_tool93_1.part, mode=Mode.SUBTRACT)


with BuildPart() as f15_tool104:
    # F15_s105 → F15_t106 (new body)
    with BuildSketch(Plane.XZ):
        with BuildLine():
            ThreePointArc((41, 14), (38.1715728753, 12.8284271247), (37, 10))
            Line((37, 10), (36.92, 10))
            Line((36.92, 10), (36.92, 14.08))
            Line((36.92, 14.08), (41, 14.08))
            Line((41, 14.08), (41, 14))
        make_face()
    extrude(amount=F15_T106_DEPTH)

    split(bisect_by=Plane(origin=(20, -20, 0), x_dir=(0, 0, 1), z_dir=(0.7071067812, -0.7071067812, 0)), keep=Keep.TOP)


with BuildPart() as f15_tool108:
    # F15_s109 → F15_t110 (new body)
    with BuildSketch(Plane(origin=(24.0710678119, 24.0710678119, 0), x_dir=(0, 0, 1), z_dir=(-0.7071067812, -0.7071067812, 0))):
        with BuildLine():
            ThreePointArc((14, -32.2842712475), (12.8284271247, -29.4558441227), (10, -28.2842712475))
            Line((10, -28.2842712475), (10, -28.2042712475))
            Line((10, -28.2042712475), (14.08, -28.2042712475))
            Line((14.08, -28.2042712475), (14.08, -32.2842712475))
            Line((14.08, -32.2842712475), (14, -32.2842712475))
        make_face()
    extrude(amount=F15_T110_DEPTH)

    split(bisect_by=Plane.YZ.offset(37), keep=Keep.TOP)


with BuildPart() as f15_tool104_1:
    add(f15_tool104.part)

    # F15_t112: intersect F15_tool108
    add(f15_tool108.part, mode=Mode.INTERSECT)


with BuildPart() as f1_15:
    add(f1_14.part)

    # F15_t102: cut F15_tool104
    add(f15_tool104_1.part, mode=Mode.SUBTRACT)


with BuildPart() as f15_tool115:
    # F15_s116 → F15_t117 (new body)
    with BuildSketch(Plane.XZ.offset(7)):
        with BuildLine():
            ThreePointArc((23, 10), (24.1715728753, 12.8284271247), (27, 14))
            Line((27, 14), (27, 14.08))
            Line((27, 14.08), (22.92, 14.08))
            Line((22.92, 14.08), (22.92, 10))
            Line((22.92, 10), (23, 10))
        make_face()
    extrude(amount=F15_T117_DEPTH)

    split(bisect_by=Plane(origin=(20, -20, 0), x_dir=(0, 0, 1), z_dir=(-0.7071067812, 0.7071067812, 0)), keep=Keep.TOP)


with BuildPart() as f15_tool119:
    # F15_s120 → F15_t121 (new body)
    with BuildSketch(Plane(origin=(24.0710678119, 24.0710678119, 0), x_dir=(0, 0, 1), z_dir=(-0.7071067812, -0.7071067812, 0))):
        with BuildLine():
            ThreePointArc((14, -32.2842712475), (12.8284271247, -29.4558441227), (10, -28.2842712475))
            Line((10, -28.2842712475), (10, -28.2042712475))
            Line((10, -28.2042712475), (14.08, -28.2042712475))
            Line((14.08, -28.2042712475), (14.08, -32.2842712475))
            Line((14.08, -32.2842712475), (14, -32.2842712475))
        make_face()
    extrude(amount=F15_T121_DEPTH)

    split(bisect_by=Plane.YZ.offset(23), keep=Keep.BOTTOM)


with BuildPart() as f15_tool115_1:
    add(f15_tool115.part)

    # F15_t123: intersect F15_tool119
    add(f15_tool119.part, mode=Mode.INTERSECT)


with BuildPart() as f1_16:
    add(f1_15.part)

    # F15_t113: cut F15_tool115
    add(f15_tool115_1.part, mode=Mode.SUBTRACT)


with BuildPart() as f15_tool126:
    # F15_s127 → F15_t128 (new body)
    with BuildSketch(Plane.YZ.offset(43)):
        with BuildLine():
            ThreePointArc((-4, -5), (-1.1715728753, -3.8284271247), (0, -1))
            Line((0, -1), (0.08, -1))
            Line((0.08, -1), (0.08, -5.08))
            Line((0.08, -5.08), (-4, -5.08))
            Line((-4, -5.08), (-4, -5))
        make_face()
    extrude(amount=-F15_T128_DEPTH)

    split(bisect_by=Plane(origin=(14.25, 0, -14.25), x_dir=(0, 1, 0), z_dir=(-0.7071067812, 0, 0.7071067812)), keep=Keep.TOP)


with BuildPart() as f15_tool130:
    # F15_s131 → F15_t132 (new body)
    with BuildSketch(Plane(origin=(-0.3210678119, 0, -0.3210678119), x_dir=(0, 1, 0), z_dir=(0.7071067812, 0, 0.7071067812))):
        with BuildLine():
            ThreePointArc((-4, -20.1525432638), (-1.1715728753, -18.9809703886), (0, -16.1525432638))
            Line((0, -16.1525432638), (0.08, -16.1525432638))
            Line((0.08, -16.1525432638), (0.08, -20.2325432638))
            Line((0.08, -20.2325432638), (-4, -20.2325432638))
            Line((-4, -20.2325432638), (-4, -20.1525432638))
        make_face()
    extrude(amount=F15_T132_DEPTH)

    split(bisect_by=Plane.XY.offset(-5), keep=Keep.TOP)


with BuildPart() as f15_tool126_1:
    add(f15_tool126.part)

    # F15_t134: intersect F15_tool130
    add(f15_tool130.part, mode=Mode.INTERSECT)


with BuildPart() as f1_17:
    add(f1_16.part)

    # F15_t124: cut F15_tool126
    add(f15_tool126_1.part, mode=Mode.SUBTRACT)


with BuildPart() as f15_tool137:
    # F15_s138 → F15_t139 (new body)
    with BuildSketch(Plane(origin=(-0.3210678119, 0, -0.3210678119), x_dir=(0, 1, 0), z_dir=(0.7071067812, 0, 0.7071067812))):
        with BuildLine():
            ThreePointArc((-4, -20.1525432638), (-1.1715728753, -18.9809703886), (0, -16.1525432638))
            Line((0, -16.1525432638), (0.08, -16.1525432638))
            Line((0.08, -16.1525432638), (0.08, -20.2325432638))
            Line((0.08, -20.2325432638), (-4, -20.2325432638))
            Line((-4, -20.2325432638), (-4, -20.1525432638))
        make_face()
    extrude(amount=F15_T139_DEPTH)

    split(bisect_by=Plane.XY.offset(-7.5), keep=Keep.BOTTOM)


with BuildPart() as f15_tool141:
    # F15_s142 → F15_t143 (new body)
    with BuildSketch(Plane.YZ.offset(-10)):
        with BuildLine():
            ThreePointArc((-4, -7.5), (-1.1715728753, -6.3284271247), (0, -3.5))
            Line((0, -3.5), (0.08, -3.5))
            Line((0.08, -3.5), (0.08, -7.58))
            Line((0.08, -7.58), (-4, -7.58))
            Line((-4, -7.58), (-4, -7.5))
        make_face()
    extrude(amount=F15_T143_DEPTH)

    split(bisect_by=Plane(origin=(14.25, 0, -14.25), x_dir=(0, 1, 0), z_dir=(0.7071067812, 0, -0.7071067812)), keep=Keep.TOP)


with BuildPart() as f15_tool137_1:
    add(f15_tool137.part)

    # F15_t145: intersect F15_tool141
    add(f15_tool141.part, mode=Mode.INTERSECT)


with BuildPart() as f1_18:
    add(f1_17.part)

    # F15_t135: cut F15_tool137
    add(f15_tool137_1.part, mode=Mode.SUBTRACT)


with BuildPart() as f15_tool148:
    # F15_s149 → F15_t150 (new body)
    with BuildSketch(Plane.YZ.offset(-10)):
        with BuildLine():
            ThreePointArc((-4, -7.5), (-1.1715728753, -6.3284271247), (0, -3.5))
            Line((0, -3.5), (0.08, -3.5))
            Line((0.08, -3.5), (0.08, -7.58))
            Line((0.08, -7.58), (-4, -7.58))
            Line((-4, -7.58), (-4, -7.5))
        make_face()
    extrude(amount=F15_T150_DEPTH)

    split(bisect_by=Plane(origin=(-3.75, 0, -3.75), x_dir=(0, 1, 0), z_dir=(-0.7071067812, 0, -0.7071067812)), keep=Keep.TOP)


with BuildPart() as f15_tool152:
    # F15_s153 → F15_t154 (new body)
    with BuildSketch(Plane(origin=(-5.8210678119, 0, 5.8210678119), x_dir=(0, 1, 0), z_dir=(0.7071067812, 0, -0.7071067812))):
        with BuildLine():
            ThreePointArc((-4, -5.3033008589), (-1.1715728753, -4.1317279836), (0, -1.3033008589))
            Line((0, -1.3033008589), (0.08, -1.3033008589))
            Line((0.08, -1.3033008589), (0.08, -5.3833008589))
            Line((0.08, -5.3833008589), (-4, -5.3833008589))
            Line((-4, -5.3833008589), (-4, -5.3033008589))
        make_face()
    extrude(amount=F15_T154_DEPTH)

    split(bisect_by=Plane.XY.offset(-7.5), keep=Keep.BOTTOM)


with BuildPart() as f15_tool148_1:
    add(f15_tool148.part)

    # F15_t156: intersect F15_tool152
    add(f15_tool152.part, mode=Mode.INTERSECT)


with BuildPart() as f1_19:
    add(f1_18.part)

    # F15_t146: cut F15_tool148
    add(f15_tool148_1.part, mode=Mode.SUBTRACT)


with BuildPart() as f15_tool159:
    # F15_s160 → F15_t161 (new body)
    with BuildSketch(Plane(origin=(-5.8210678119, 0, 5.8210678119), x_dir=(0, 1, 0), z_dir=(0.7071067812, 0, -0.7071067812))):
        with BuildLine():
            ThreePointArc((-4, -5.3033008589), (-1.1715728753, -4.1317279836), (0, -1.3033008589))
            Line((0, -1.3033008589), (0.08, -1.3033008589))
            Line((0.08, -1.3033008589), (0.08, -5.3833008589))
            Line((0.08, -5.3833008589), (-4, -5.3833008589))
            Line((-4, -5.3833008589), (-4, -5.3033008589))
        make_face()
    extrude(amount=F15_T161_DEPTH)

    split(bisect_by=Plane.XY.offset(-5), keep=Keep.TOP)


with BuildPart() as f15_tool163:
    # F15_s164 → F15_t165 (new body)
    with BuildSketch(Plane.YZ.offset(7.5)):
        with BuildLine():
            ThreePointArc((-4, -5), (-1.1715728753, -3.8284271247), (0, -1))
            Line((0, -1), (0.08, -1))
            Line((0.08, -1), (0.08, -5.08))
            Line((0.08, -5.08), (-4, -5.08))
            Line((-4, -5.08), (-4, -5))
        make_face()
    extrude(amount=-F15_T165_DEPTH)

    split(bisect_by=Plane(origin=(-3.75, 0, -3.75), x_dir=(0, 1, 0), z_dir=(0.7071067812, 0, 0.7071067812)), keep=Keep.TOP)


with BuildPart() as f15_tool159_1:
    add(f15_tool159.part)

    # F15_t167: intersect F15_tool163
    add(f15_tool163.part, mode=Mode.INTERSECT)


with BuildPart() as f1_20:
    add(f1_19.part)

    # F15_t157: cut F15_tool159
    add(f15_tool159_1.part, mode=Mode.SUBTRACT)


with BuildPart() as f1_21:
    # F16: moved
    add(f1_20.part.rotate(Axis((10.5, -27, -7.5), (-1, 0, 0)), F16_ANGLE))


solid = f1_21.part
